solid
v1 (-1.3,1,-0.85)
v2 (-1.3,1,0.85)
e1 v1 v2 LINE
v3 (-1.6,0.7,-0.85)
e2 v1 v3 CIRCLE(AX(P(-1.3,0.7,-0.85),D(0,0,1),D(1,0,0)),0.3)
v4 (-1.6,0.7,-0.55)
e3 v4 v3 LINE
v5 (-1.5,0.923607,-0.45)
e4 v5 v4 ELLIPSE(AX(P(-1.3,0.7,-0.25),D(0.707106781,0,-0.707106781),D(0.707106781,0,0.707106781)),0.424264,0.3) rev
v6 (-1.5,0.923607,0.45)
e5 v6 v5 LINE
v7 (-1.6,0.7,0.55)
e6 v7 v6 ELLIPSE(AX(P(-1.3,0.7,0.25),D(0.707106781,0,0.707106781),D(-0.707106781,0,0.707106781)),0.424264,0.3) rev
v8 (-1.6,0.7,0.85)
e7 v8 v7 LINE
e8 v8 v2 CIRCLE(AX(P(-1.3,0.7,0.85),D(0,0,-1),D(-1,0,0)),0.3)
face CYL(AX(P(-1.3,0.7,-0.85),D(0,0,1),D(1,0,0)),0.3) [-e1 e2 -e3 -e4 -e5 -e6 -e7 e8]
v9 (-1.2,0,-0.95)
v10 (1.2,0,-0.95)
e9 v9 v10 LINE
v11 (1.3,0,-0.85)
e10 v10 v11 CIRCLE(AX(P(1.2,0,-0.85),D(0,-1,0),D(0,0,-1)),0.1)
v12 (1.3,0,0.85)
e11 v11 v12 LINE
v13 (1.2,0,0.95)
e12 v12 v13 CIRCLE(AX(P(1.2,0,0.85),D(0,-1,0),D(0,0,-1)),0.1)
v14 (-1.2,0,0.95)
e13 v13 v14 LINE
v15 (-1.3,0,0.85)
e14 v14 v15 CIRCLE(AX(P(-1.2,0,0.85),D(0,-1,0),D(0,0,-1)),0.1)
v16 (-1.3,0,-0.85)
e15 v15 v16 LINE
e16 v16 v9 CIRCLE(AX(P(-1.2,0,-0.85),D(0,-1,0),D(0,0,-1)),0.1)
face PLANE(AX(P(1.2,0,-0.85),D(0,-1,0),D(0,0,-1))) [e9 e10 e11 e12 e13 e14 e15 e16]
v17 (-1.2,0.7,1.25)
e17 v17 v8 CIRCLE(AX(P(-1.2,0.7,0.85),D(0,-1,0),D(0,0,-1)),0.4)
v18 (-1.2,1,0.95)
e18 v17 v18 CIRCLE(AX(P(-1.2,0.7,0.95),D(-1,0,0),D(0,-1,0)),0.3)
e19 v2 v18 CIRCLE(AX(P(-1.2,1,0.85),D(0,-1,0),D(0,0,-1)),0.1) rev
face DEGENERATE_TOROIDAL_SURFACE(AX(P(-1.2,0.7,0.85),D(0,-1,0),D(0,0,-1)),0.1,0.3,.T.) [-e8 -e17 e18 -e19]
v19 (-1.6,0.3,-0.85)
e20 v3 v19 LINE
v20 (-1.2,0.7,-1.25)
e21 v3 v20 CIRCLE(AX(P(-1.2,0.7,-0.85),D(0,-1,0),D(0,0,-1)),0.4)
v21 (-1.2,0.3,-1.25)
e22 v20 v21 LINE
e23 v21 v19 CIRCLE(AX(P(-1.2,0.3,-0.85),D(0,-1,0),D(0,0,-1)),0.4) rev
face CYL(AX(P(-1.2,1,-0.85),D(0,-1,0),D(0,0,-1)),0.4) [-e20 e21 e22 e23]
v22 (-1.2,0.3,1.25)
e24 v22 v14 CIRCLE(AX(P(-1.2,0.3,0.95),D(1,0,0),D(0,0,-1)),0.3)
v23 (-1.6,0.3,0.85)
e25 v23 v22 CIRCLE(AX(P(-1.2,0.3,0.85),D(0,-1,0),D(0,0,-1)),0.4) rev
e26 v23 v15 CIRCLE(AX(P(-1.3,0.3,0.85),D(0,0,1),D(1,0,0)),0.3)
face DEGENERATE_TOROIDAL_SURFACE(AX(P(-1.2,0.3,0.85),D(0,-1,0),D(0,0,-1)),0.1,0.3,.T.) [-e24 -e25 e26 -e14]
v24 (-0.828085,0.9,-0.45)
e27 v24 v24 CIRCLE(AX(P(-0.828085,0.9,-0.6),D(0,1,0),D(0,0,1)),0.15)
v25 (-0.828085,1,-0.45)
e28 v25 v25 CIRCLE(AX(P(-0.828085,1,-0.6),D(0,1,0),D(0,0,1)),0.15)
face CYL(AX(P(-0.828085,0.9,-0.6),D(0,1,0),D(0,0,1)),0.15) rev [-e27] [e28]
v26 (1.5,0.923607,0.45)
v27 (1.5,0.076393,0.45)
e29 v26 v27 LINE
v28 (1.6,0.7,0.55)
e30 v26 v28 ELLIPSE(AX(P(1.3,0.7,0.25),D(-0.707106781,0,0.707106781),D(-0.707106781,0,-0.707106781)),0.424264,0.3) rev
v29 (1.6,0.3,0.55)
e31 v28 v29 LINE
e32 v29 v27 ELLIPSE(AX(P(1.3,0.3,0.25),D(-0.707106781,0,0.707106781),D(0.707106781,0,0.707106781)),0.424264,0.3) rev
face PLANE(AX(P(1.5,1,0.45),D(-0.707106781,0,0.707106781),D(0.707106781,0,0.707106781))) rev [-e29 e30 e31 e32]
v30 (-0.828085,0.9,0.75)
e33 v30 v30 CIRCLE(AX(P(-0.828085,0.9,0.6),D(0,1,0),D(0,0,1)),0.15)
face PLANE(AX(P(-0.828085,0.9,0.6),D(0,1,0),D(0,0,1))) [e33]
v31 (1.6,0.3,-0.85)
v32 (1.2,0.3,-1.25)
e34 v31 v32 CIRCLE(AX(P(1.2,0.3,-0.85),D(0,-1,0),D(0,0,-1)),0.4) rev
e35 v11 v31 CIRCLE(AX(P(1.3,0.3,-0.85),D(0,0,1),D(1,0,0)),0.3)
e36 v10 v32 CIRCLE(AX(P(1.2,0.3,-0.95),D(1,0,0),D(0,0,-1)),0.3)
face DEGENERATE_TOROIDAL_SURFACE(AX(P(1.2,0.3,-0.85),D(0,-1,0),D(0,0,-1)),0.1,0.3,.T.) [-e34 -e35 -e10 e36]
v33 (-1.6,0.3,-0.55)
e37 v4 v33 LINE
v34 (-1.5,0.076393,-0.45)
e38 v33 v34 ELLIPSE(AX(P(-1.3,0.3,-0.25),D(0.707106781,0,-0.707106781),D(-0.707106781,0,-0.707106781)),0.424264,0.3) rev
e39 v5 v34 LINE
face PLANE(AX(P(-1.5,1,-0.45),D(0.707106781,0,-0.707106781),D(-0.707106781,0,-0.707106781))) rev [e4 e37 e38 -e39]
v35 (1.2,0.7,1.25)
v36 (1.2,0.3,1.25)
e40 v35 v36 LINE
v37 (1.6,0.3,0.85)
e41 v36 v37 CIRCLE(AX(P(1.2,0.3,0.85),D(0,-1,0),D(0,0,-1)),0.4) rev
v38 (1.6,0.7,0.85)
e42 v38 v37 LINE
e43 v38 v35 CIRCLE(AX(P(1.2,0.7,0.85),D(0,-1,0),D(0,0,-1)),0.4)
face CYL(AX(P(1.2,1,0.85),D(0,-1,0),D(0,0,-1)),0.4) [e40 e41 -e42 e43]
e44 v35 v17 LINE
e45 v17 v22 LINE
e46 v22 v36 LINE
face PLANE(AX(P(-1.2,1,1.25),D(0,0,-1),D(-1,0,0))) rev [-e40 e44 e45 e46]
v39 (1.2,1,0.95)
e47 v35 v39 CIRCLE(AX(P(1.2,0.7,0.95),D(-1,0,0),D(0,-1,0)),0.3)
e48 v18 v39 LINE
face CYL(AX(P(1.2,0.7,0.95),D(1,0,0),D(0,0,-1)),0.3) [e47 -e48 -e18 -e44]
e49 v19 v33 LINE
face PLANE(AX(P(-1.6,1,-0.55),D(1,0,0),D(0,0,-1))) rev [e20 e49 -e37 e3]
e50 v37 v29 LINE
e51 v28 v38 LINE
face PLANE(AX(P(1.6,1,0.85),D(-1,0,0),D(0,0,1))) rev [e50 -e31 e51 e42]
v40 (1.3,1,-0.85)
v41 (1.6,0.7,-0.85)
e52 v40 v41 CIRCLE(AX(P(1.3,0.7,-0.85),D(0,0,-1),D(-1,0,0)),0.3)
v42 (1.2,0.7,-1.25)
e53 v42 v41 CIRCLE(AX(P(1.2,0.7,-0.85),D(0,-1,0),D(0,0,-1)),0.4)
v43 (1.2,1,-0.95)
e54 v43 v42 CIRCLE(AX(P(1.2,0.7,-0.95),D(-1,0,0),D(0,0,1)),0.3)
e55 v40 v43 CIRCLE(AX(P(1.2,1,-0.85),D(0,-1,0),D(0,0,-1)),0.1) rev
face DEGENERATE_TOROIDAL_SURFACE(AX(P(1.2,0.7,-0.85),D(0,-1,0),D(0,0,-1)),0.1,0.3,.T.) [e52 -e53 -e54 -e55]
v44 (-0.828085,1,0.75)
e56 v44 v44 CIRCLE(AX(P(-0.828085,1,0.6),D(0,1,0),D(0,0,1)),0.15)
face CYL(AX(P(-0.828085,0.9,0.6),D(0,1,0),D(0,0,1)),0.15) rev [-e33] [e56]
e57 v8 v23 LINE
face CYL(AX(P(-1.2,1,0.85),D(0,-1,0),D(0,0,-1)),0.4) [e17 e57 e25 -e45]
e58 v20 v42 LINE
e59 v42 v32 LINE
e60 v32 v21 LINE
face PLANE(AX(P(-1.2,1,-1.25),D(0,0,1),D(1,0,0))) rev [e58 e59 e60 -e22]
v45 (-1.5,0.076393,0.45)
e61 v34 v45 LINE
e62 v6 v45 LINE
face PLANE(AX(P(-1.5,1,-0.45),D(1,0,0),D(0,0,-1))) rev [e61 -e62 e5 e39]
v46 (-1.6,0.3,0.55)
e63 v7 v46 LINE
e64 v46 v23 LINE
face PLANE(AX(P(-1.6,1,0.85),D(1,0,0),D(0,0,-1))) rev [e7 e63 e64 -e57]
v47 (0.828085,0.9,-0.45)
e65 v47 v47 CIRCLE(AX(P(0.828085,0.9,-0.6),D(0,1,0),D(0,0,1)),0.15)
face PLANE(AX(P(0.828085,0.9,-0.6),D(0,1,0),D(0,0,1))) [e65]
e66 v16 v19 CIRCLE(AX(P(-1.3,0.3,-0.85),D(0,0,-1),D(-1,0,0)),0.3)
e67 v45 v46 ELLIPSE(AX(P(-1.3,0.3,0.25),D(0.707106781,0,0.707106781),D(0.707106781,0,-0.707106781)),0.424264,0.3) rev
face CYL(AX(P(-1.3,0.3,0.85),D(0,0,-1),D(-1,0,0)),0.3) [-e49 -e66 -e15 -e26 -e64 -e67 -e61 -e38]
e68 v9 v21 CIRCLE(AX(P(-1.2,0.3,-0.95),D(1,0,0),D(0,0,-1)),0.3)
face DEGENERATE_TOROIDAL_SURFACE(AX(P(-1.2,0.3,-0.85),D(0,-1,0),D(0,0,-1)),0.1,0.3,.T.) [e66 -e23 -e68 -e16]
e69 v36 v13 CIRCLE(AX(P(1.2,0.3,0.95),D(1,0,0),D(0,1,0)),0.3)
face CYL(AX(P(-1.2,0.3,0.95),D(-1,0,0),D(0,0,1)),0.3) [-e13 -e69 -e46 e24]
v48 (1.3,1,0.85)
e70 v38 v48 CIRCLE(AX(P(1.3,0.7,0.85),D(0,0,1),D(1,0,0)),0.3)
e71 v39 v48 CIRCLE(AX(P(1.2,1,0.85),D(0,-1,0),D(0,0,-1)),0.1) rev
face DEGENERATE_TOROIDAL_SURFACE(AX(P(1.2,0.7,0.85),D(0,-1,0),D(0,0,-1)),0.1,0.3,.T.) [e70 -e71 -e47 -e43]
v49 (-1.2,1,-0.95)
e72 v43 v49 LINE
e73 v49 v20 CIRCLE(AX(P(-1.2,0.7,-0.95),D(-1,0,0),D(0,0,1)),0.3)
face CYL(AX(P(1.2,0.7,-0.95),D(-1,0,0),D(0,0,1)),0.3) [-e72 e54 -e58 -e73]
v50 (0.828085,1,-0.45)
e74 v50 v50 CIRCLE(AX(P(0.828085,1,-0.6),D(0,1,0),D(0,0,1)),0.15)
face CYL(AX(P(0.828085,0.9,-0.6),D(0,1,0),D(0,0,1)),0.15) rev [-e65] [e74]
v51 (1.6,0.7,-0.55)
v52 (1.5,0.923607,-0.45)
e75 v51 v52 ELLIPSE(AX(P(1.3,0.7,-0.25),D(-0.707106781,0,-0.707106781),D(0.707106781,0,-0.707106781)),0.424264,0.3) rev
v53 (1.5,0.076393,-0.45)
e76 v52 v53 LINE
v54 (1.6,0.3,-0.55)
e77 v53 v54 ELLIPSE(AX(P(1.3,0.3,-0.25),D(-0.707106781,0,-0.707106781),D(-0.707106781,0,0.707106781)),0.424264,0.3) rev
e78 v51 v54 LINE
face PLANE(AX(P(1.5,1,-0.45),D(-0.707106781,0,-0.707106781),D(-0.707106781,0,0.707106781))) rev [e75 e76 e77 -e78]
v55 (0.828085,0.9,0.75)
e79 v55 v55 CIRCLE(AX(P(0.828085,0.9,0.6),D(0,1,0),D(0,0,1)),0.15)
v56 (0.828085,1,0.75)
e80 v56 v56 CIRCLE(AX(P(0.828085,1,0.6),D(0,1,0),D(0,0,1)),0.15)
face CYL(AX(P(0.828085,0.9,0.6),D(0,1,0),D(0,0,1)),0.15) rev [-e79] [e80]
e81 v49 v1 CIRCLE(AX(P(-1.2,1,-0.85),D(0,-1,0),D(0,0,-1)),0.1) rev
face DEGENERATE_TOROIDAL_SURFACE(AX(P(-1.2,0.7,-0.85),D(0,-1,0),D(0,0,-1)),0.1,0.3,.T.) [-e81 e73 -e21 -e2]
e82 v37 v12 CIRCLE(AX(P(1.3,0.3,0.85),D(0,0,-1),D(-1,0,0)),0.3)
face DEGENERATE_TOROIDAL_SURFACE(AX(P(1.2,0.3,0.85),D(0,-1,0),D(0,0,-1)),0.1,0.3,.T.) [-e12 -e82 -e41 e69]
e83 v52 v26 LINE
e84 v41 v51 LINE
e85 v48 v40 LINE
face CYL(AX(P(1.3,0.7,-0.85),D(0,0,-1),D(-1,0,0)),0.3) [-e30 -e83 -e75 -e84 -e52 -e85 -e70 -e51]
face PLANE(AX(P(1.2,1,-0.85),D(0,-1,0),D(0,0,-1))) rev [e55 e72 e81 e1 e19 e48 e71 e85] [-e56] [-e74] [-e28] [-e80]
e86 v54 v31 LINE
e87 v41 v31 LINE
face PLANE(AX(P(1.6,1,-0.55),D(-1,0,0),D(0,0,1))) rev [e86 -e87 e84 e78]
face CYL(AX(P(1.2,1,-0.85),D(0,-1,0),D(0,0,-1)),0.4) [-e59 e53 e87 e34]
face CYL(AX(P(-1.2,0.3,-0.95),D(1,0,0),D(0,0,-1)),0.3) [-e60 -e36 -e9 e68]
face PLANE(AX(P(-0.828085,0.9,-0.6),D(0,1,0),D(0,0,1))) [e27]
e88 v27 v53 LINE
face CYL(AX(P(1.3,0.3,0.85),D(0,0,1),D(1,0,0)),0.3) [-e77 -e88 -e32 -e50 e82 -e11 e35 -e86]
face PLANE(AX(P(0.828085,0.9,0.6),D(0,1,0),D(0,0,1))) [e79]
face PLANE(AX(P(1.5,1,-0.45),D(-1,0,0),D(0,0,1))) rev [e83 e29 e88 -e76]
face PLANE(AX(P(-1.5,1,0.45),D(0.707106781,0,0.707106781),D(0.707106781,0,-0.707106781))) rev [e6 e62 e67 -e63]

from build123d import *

# Parameters (mm, degrees)
BOSS_EXTRUDE1_DEPTH = 1
FILLET2_R           = 0.3
SKETCH2_R           = 0.15
CUT_EXTRUDE1_DEPTH  = 0.1


with BuildPart() as part:
    # Sketch1 → Boss-Extrude1 (new body)
    with BuildSketch(Plane(origin=(0, 0, 0), x_dir=(1, 0, 0), z_dir=(0, 1, 0))):
        with BuildLine():
            Line((-1.2, -1.25), (1.2, -1.25))
            ThreePointArc((1.2, -1.25), (1.482842712, -1.132842712), (1.6, -0.85))
            Line((1.6, -0.85), (1.6, -0.55))
            Line((1.6, -0.55), (1.5, -0.45))
            Line((1.5, -0.45), (1.5, 0.45))
            Line((1.5, 0.45), (1.6, 0.55))
            Line((1.6, 0.55), (1.6, 0.85))
            ThreePointArc((1.6, 0.85), (1.482842712, 1.132842712), (1.2, 1.25))
            Line((1.2, 1.25), (-1.2, 1.25))
            ThreePointArc((-1.2, 1.25), (-1.482842712, 1.132842712), (-1.6, 0.85))
            Line((-1.6, 0.85), (-1.6, 0.55))
            Line((-1.6, 0.55), (-1.5, 0.45))
            Line((-1.5, 0.45), (-1.5, -0.45))
            Line((-1.5, -0.45), (-1.6, -0.55))
            Line((-1.6, -0.55), (-1.6, -0.85))
            ThreePointArc((-1.6, -0.85), (-1.482842712, -1.132842712), (-1.2, -1.25))
        make_face()
    extrude(amount=BOSS_EXTRUDE1_DEPTH)

    # Fillet2
    # the kernel refuses this fillet: 0.3 mm, written as the material it takes off along each edge
    with BuildSketch(Plane(origin=(-1.2, 1, 0.85), x_dir=(-1, 0, 0), z_dir=(0, 0, -1))) as fillet2_piece_1:
        with BuildLine():
            CenterArc((0.4 - FILLET2_R, -FILLET2_R), FILLET2_R, 0, 90)
            Line((0.4 - FILLET2_R, 0), (0.4, 0))
            Line((0.4, 0), (0.4, -FILLET2_R))
        make_face()
    revolve(axis=Axis((-1.2, 1, 0.85), (0, 1, 0)), revolution_arc=90, mode=Mode.SUBTRACT)
    with BuildSketch(Plane(origin=(-1.2, 1, 1.25), x_dir=(0, -1, 0), z_dir=(1, 0, 0)), Plane(origin=(1.2, 1, -1.25), x_dir=(0, -1, 0), z_dir=(-1, 0, 0))) as fillet2_piece_2:
        with BuildLine():
            CenterArc((FILLET2_R, FILLET2_R), FILLET2_R, 180, 90)
            Line((0, FILLET2_R), (0, 0))
            Line((0, 0), (FILLET2_R, 0))
        make_face()
    extrude(amount=2.4, mode=Mode.SUBTRACT)
    with BuildSketch(Plane(origin=(-1.6, 1, -0.85), x_dir=(0, -1, 0), z_dir=(0, 0, 1)), Plane(origin=(1.6, 1, 0.2), x_dir=(0, -1, 0), z_dir=(0, 0, -1)), Plane(origin=(1.6, 1, 0.85), x_dir=(0, -1, 0), z_dir=(0, 0, -1)), Plane(origin=(-1.6, 1, -0.2), x_dir=(0, -1, 0), z_dir=(0, 0, 1))) as fillet2_piece_3:
        with BuildLine():
            CenterArc((FILLET2_R, FILLET2_R), FILLET2_R, 180, 90)
            Line((0, FILLET2_R), (0, 0))
            Line((0, 0), (FILLET2_R, 0))
        make_face()
    extrude(amount=1.05, mode=Mode.SUBTRACT)
    with BuildSketch(Plane(origin=(-1.2, 1, -0.85), x_dir=(0, 0, -1), z_dir=(1, 0, 0))) as fillet2_piece_4:
        with BuildLine():
            CenterArc((0.4 - FILLET2_R, -FILLET2_R), FILLET2_R, 0, 90)
            Line((0.4 - FILLET2_R, 0), (0.4, 0))
            Line((0.4, 0), (0.4, -FILLET2_R))
        make_face()
    revolve(axis=Axis((-1.2, 1, -0.85), (0, 1, 0)), revolution_arc=90, mode=Mode.SUBTRACT)
    with BuildSketch(Plane(origin=(1.2, 1, -0.85), x_dir=(1, 0, 0), z_dir=(0, 0, 1))) as fillet2_piece_5:
        with BuildLine():
            CenterArc((0.4 - FILLET2_R, -FILLET2_R), FILLET2_R, 0, 90)
            Line((0.4 - FILLET2_R, 0), (0.4, 0))
            Line((0.4, 0), (0.4, -FILLET2_R))
        make_face()
    revolve(axis=Axis((1.2, 1, -0.85), (0, 1, 0)), revolution_arc=90, mode=Mode.SUBTRACT)
    with BuildSketch(Plane(origin=(1.2, 1, 0.85), x_dir=(0, 0, 1), z_dir=(-1, 0, 0))) as fillet2_piece_6:
        with BuildLine():
            CenterArc((0.4 - FILLET2_R, -FILLET2_R), FILLET2_R, 0, 90)
            Line((0.4 - FILLET2_R, 0), (0.4, 0))
            Line((0.4, 0), (0.4, -FILLET2_R))
        make_face()
    revolve(axis=Axis((1.2, 1, 0.85), (0, 1, 0)), revolution_arc=90, mode=Mode.SUBTRACT)
    with BuildSketch(Plane(origin=(1.2, 0, -0.85), x_dir=(1, 0, 0), z_dir=(0, 0, 1))) as fillet2_piece_7:
        with BuildLine():
            CenterArc((0.4 - FILLET2_R, FILLET2_R), FILLET2_R, 270, 90)
            Line((0.4 - FILLET2_R, 0), (0.4, 0))
            Line((0.4, 0), (0.4, FILLET2_R))
        make_face()
    revolve(axis=Axis((1.2, 0, -0.85), (0, 1, 0)), revolution_arc=90, mode=Mode.SUBTRACT)
    with BuildSketch(Plane(origin=(-1.2, 0, -0.85), x_dir=(0, 0, -1), z_dir=(1, 0, 0))) as fillet2_piece_8:
        with BuildLine():
            CenterArc((0.4 - FILLET2_R, FILLET2_R), FILLET2_R, 270, 90)
            Line((0.4 - FILLET2_R, 0), (0.4, 0))
            Line((0.4, 0), (0.4, FILLET2_R))
        make_face()
    revolve(axis=Axis((-1.2, 0, -0.85), (0, 1, 0)), revolution_arc=90, mode=Mode.SUBTRACT)
    with BuildSketch(Plane(origin=(-1.6, 0, -0.2), x_dir=(0, 1, 0), z_dir=(0, 0, 1)), Plane(origin=(1.6, 0, 0.85), x_dir=(0, 1, 0), z_dir=(0, 0, -1)), Plane(origin=(-1.6, 0, -0.85), x_dir=(0, 1, 0), z_dir=(0, 0, 1)), Plane(origin=(1.6, 0, 0.2), x_dir=(0, 1, 0), z_dir=(0, 0, -1))) as fillet2_piece_9:
        with BuildLine():
            CenterArc((FILLET2_R, -FILLET2_R), FILLET2_R, 90, 90)
            Line((0, -FILLET2_R), (0, 0))
            Line((0, 0), (FILLET2_R, 0))
        make_face()
    extrude(amount=1.05, mode=Mode.SUBTRACT)
    with BuildSketch(Plane(origin=(-1.2, 0, 0.85), x_dir=(-1, 0, 0), z_dir=(0, 0, -1))) as fillet2_piece_10:
        with BuildLine():
            CenterArc((0.4 - FILLET2_R, FILLET2_R), FILLET2_R, 270, 90)
            Line((0.4 - FILLET2_R, 0), (0.4, 0))
            Line((0.4, 0), (0.4, FILLET2_R))
        make_face()
    revolve(axis=Axis((-1.2, 0, 0.85), (0, 1, 0)), revolution_arc=90, mode=Mode.SUBTRACT)
    with BuildSketch(Plane(origin=(1.2, 0, 0.85), x_dir=(0, 0, 1), z_dir=(-1, 0, 0))) as fillet2_piece_11:
        with BuildLine():
            CenterArc((0.4 - FILLET2_R, FILLET2_R), FILLET2_R, 270, 90)
            Line((0.4 - FILLET2_R, 0), (0.4, 0))
            Line((0.4, 0), (0.4, FILLET2_R))
        make_face()
    revolve(axis=Axis((1.2, 0, 0.85), (0, 1, 0)), revolution_arc=90, mode=Mode.SUBTRACT)
    with BuildSketch(Plane(origin=(1.2, 0, -1.25), x_dir=(0, 1, 0), z_dir=(-1, 0, 0)), Plane(origin=(-1.2, 0, 1.25), x_dir=(0, 1, 0), z_dir=(1, 0, 0))) as fillet2_piece_12:
        with BuildLine():
            CenterArc((FILLET2_R, -FILLET2_R), FILLET2_R, 90, 90)
            Line((0, -FILLET2_R), (0, 0))
            Line((0, 0), (FILLET2_R, 0))
        make_face()
    extrude(amount=2.4, mode=Mode.SUBTRACT)

    # Sketch2 → Cut-Extrude1 (cut)
    with BuildSketch(Plane(origin=(0, 1, 0), x_dir=(1, 0, 0), z_dir=(0, 1, 0))):
        with Locations(Location((0.82808468, 0.6, 0), (0, 0, 270))):
            Circle(SKETCH2_R)
        with Locations(Location((-0.82808468, 0.6, 0), (0, 0, 270))):
            Circle(SKETCH2_R)
        with Locations(Location((-0.82808468, -0.6, 0), (0, 0, 270))):
            Circle(SKETCH2_R)
        with Locations(Location((0.82808468, -0.6, 0), (0, 0, 270))):
            Circle(SKETCH2_R)
    extrude(amount=-CUT_EXTRUDE1_DEPTH, mode=Mode.SUBTRACT)


solid = part.part
